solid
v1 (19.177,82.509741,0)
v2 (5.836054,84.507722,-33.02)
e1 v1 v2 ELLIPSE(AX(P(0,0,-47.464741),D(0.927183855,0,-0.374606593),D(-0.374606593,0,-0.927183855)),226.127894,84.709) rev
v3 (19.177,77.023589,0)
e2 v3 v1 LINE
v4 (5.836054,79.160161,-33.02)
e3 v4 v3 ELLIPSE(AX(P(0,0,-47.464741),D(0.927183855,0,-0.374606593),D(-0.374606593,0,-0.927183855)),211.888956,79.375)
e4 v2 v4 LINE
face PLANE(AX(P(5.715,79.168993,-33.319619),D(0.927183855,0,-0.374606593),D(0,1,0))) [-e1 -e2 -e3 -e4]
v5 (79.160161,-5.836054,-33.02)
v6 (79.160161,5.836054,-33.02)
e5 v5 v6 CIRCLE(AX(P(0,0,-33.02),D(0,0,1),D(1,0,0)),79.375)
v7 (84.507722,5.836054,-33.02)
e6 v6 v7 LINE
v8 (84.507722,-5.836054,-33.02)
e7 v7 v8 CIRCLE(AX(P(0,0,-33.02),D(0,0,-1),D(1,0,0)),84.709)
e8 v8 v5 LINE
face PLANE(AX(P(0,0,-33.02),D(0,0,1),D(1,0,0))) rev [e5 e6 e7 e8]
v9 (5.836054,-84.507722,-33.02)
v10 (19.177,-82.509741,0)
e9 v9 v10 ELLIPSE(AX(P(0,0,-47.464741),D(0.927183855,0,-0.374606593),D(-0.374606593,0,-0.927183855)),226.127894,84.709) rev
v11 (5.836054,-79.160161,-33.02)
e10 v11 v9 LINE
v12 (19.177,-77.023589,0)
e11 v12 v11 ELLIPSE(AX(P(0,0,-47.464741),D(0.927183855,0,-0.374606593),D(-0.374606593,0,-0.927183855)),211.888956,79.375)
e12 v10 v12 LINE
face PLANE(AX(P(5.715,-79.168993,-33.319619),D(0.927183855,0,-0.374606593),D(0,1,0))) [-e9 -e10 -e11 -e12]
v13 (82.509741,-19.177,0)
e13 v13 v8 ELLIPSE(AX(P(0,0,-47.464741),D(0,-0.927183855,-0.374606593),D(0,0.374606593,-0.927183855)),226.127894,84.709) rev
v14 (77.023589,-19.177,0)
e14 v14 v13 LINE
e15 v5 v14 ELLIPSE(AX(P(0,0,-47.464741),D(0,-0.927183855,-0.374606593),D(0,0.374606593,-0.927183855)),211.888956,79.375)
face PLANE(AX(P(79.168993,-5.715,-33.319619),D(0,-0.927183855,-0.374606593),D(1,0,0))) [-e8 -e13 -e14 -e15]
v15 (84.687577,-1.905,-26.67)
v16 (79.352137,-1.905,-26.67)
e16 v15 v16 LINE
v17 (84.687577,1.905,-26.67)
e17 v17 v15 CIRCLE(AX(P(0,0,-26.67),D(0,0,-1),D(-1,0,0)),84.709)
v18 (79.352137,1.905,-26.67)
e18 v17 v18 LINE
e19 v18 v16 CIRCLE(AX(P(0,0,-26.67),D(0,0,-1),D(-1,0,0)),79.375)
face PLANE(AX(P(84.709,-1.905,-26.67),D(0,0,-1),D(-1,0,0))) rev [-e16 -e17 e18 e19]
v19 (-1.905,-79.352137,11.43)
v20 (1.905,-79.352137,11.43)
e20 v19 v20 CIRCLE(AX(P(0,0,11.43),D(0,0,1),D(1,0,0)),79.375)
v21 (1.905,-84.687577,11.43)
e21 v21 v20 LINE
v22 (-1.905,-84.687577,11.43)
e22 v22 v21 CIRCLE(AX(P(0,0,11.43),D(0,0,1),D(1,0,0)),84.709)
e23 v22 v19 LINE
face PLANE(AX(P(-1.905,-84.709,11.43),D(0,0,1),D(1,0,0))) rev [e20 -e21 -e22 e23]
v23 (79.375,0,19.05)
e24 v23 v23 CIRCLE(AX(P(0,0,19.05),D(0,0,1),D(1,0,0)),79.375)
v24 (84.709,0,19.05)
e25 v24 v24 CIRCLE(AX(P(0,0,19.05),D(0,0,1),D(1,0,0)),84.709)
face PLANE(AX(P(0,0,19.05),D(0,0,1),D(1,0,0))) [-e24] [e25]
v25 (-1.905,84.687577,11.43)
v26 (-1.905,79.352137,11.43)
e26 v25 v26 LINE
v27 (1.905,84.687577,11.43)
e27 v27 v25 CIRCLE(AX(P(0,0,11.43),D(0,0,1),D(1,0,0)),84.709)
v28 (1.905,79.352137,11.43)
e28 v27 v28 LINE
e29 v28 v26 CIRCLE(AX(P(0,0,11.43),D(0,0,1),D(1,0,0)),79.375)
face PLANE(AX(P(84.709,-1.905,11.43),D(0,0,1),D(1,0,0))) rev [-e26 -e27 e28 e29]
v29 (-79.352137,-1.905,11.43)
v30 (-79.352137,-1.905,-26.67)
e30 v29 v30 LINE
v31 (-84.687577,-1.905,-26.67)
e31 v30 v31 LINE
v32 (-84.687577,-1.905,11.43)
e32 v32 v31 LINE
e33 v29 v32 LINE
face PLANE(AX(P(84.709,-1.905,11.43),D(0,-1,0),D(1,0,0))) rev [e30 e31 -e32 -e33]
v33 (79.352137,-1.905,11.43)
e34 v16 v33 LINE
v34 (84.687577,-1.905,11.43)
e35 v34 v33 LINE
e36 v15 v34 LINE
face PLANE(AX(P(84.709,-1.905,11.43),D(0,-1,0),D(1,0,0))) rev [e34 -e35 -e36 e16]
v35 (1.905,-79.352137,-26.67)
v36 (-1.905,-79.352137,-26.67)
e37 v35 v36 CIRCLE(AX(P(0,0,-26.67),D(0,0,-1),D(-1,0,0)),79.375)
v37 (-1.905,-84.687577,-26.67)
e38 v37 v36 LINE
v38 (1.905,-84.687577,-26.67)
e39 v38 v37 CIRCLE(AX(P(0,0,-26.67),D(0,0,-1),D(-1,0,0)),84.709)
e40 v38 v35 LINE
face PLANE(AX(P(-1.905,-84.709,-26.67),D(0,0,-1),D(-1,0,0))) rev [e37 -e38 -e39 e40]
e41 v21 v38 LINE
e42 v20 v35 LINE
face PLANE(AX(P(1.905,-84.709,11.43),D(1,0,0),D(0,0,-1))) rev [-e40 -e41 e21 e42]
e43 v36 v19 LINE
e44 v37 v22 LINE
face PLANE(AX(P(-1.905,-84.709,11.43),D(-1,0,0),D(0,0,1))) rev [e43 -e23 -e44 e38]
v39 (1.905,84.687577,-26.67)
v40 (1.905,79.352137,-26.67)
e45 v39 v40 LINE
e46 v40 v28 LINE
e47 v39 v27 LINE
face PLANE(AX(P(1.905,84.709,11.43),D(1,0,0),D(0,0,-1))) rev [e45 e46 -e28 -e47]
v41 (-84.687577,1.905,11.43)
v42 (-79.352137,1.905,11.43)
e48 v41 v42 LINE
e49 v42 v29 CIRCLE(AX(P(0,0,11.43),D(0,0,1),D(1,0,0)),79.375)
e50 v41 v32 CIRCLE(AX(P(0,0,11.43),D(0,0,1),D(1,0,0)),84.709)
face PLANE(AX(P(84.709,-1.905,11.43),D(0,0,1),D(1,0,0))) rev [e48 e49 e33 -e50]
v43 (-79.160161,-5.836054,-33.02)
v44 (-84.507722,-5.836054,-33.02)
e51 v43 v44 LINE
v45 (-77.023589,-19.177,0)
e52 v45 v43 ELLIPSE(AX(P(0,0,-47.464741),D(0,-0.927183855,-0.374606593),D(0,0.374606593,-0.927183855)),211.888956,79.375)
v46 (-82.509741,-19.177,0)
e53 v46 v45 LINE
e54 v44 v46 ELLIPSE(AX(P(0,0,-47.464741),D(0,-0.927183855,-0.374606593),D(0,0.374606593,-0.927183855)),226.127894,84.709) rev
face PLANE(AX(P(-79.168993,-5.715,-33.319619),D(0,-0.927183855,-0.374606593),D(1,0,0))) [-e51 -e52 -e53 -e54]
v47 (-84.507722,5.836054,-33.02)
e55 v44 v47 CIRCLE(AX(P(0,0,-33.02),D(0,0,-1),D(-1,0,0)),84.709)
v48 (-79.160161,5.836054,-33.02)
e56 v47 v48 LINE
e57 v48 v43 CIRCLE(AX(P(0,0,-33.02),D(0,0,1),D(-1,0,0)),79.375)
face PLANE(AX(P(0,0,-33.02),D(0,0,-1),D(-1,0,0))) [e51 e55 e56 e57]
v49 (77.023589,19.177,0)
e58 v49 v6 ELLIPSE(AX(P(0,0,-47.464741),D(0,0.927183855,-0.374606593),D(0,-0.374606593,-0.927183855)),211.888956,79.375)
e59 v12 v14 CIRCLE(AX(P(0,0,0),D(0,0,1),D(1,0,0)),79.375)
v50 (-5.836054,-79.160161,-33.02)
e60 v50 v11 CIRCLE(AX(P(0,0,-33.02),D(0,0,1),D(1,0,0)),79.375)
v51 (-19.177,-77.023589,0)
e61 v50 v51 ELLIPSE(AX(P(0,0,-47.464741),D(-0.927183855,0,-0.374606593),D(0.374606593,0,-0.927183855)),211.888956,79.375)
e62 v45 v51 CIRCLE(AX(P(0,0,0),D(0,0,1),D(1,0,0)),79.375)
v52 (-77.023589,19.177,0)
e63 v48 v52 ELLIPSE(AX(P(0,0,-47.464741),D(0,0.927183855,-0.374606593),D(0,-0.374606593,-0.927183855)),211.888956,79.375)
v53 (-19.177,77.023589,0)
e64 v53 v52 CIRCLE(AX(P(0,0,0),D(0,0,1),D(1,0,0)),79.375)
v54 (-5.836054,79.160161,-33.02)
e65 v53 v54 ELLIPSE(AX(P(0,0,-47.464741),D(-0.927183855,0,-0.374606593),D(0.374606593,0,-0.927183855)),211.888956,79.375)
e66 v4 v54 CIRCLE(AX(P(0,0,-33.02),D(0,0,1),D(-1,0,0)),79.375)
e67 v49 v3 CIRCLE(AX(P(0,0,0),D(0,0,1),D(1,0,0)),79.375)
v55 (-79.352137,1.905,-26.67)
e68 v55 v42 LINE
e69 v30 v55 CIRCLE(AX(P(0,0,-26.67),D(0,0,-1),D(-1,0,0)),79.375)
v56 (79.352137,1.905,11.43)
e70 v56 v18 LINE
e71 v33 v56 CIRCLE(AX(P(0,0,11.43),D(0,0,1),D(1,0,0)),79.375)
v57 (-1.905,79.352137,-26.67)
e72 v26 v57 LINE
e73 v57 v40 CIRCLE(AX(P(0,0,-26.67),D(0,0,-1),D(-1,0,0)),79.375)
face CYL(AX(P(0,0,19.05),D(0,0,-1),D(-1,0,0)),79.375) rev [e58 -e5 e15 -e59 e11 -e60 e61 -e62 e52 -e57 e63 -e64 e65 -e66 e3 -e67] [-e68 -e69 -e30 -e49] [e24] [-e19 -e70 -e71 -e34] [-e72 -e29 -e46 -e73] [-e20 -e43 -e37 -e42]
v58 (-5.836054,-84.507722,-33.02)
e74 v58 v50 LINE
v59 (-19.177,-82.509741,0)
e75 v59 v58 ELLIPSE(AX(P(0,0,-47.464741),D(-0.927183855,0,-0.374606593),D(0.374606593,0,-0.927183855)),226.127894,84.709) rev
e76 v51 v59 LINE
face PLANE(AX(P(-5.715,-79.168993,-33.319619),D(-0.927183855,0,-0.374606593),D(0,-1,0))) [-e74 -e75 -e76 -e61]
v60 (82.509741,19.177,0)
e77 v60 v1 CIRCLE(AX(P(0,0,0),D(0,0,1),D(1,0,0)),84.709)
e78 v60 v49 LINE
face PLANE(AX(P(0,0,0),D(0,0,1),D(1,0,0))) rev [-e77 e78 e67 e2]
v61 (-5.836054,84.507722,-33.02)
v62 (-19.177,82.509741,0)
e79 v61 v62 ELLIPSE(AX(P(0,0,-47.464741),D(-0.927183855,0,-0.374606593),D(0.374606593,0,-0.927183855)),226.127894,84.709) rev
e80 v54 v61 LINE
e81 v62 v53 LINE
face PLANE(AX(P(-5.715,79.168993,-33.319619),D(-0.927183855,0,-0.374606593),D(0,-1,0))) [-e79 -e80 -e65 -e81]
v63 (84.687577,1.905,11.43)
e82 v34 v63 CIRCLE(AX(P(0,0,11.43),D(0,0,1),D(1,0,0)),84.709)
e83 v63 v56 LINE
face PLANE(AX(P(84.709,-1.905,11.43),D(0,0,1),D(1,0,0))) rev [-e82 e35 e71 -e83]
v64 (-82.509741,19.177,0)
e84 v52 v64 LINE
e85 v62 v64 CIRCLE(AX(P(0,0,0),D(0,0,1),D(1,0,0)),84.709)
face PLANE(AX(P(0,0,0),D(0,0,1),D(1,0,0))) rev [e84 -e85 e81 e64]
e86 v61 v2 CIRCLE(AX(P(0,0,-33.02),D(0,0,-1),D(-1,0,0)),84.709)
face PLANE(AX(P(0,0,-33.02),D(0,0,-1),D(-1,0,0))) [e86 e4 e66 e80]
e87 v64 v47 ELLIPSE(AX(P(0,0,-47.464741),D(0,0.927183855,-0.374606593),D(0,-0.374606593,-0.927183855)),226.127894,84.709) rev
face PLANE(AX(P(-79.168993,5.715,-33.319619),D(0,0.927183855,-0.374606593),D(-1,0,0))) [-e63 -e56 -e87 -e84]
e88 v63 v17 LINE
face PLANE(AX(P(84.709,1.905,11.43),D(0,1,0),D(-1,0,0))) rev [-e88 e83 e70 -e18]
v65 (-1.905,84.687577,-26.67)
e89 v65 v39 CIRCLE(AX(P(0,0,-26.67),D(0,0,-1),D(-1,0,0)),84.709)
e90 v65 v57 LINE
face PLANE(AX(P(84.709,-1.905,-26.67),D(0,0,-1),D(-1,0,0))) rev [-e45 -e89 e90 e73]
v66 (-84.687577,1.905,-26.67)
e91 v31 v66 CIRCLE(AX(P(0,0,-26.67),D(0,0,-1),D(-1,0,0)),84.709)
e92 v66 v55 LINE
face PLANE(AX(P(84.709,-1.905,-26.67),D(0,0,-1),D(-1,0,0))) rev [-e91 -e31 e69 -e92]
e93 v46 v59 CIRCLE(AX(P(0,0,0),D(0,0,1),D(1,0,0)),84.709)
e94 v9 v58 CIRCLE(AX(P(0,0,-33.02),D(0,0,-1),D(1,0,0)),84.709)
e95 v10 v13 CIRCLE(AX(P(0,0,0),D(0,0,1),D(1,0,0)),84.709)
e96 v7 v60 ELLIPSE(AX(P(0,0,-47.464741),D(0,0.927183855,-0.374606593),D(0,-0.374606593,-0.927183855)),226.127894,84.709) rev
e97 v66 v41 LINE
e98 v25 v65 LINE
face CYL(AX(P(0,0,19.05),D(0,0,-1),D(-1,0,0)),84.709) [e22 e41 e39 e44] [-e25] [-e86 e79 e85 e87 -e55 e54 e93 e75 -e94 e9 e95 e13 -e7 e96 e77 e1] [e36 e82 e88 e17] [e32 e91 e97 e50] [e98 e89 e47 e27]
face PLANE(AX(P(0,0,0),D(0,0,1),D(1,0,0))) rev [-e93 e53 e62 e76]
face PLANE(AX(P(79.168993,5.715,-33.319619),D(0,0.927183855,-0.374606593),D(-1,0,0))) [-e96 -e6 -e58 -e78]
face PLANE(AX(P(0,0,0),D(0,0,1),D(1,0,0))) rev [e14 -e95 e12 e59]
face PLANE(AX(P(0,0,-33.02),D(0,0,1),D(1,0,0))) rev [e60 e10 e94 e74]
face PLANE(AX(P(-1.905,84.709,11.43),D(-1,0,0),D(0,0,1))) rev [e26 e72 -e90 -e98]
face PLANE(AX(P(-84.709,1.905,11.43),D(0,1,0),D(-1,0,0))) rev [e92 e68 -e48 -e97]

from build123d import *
from build123d.topology import SkipClean

# Parameters (mm, degrees)
SKETCH1_R           = 84.709
SKETCH1_R_2         = 79.375
BOSS_EXTRUDE1_DEPTH = 19.05
BOSS_EXTRUDE2_START = 33.02
BOSS_EXTRUDE2_DEPTH = 33.02
SKETCH2_W           = 3.81
SKETCH2_H           = 38.1
CUT_EXTRUDE1_DEPTH  = 125.264032455
CIRPATTERN1_COUNT   = 4
CHAMFER1_SIZE       = 13.462
CHAMFER1_SIZE_2     = 33.319619221


with BuildPart() as part:
    # Sketch1 → Boss-Extrude1 (new body)
    with BuildSketch(Plane.XY):
        with Locations(Location((0, 0, 0), (0, 0, 180))):
            Circle(SKETCH1_R)
        with Locations(Location((0, 0, 0), (0, 0, 180))):
            Circle(SKETCH1_R_2, mode=Mode.SUBTRACT)
    extrude(amount=BOSS_EXTRUDE1_DEPTH)

    # Sketch3 → Boss-Extrude2 (add)
    with SkipClean():  # the faces are left unmerged after this step: merging them gives an invalid solid
        with BuildSketch(Plane(origin=(0, 0, 0), x_dir=(-1, 0, 0), z_dir=(0, 0, -1)).offset(BOSS_EXTRUDE2_START)):
            with BuildLine():
                Line((-5.715, 79.168992668), (-5.715, 84.515995267))
                ThreePointArc((-5.715, 84.515995267), (0, 84.709), (5.715, 84.515995267))
                Line((5.715, 84.515995267), (5.715, 79.168992668))
                ThreePointArc((5.715, 79.168992668), (0, 79.375), (-5.715, 79.168992668))
            make_face()
            with BuildLine():
                Line((-5.715, -79.168992668), (-5.715, -84.515995267))
                ThreePointArc((-5.715, -84.515995267), (0, -84.709), (5.715, -84.515995267))
                Line((5.715, -84.515995267), (5.715, -79.168992668))
                ThreePointArc((5.715, -79.168992668), (0, -79.375), (-5.715, -79.168992668))
            make_face()
            with BuildLine():
                Line((79.168992668, -5.715), (84.515995267, -5.715))
                ThreePointArc((84.515995267, -5.715), (84.709, 0), (84.515995267, 5.715))
                Line((84.515995267, 5.715), (79.168992668, 5.715))
                ThreePointArc((79.168992668, 5.715), (79.375, 0), (79.168992668, -5.715))
            make_face()
            with BuildLine():
                Line((-79.168992668, 5.715), (-84.515995267, 5.715))
                ThreePointArc((-84.515995267, 5.715), (-84.709, 0), (-84.515995267, -5.715))
                Line((-84.515995267, -5.715), (-79.168992668, -5.715))
                ThreePointArc((-79.168992668, -5.715), (-79.375, 0), (-79.168992668, 5.715))
            make_face()
        extrude(amount=-BOSS_EXTRUDE2_DEPTH)

    # Sketch2 → Cut-Extrude1 (cut, through all)
    with SkipClean():  # the faces are left unmerged after this step: merging them gives an invalid solid
        with BuildSketch(Plane(origin=(0, 0, 0), x_dir=(1, 0, 0), z_dir=(0, 1, 0))):
            with Locations((0, 7.62)):
                Rectangle(SKETCH2_W, SKETCH2_H)
        cut_extrude1 = extrude(amount=-CUT_EXTRUDE1_DEPTH, mode=Mode.SUBTRACT)

    # CirPattern1: Cut-Extrude1 ×4 about axis
    with SkipClean():  # the faces are left unmerged after this step: merging them gives an invalid solid
        cirpattern1_axis = Axis((0, 0, 0), (0, 0, 1))
        for i in range(1, CIRPATTERN1_COUNT):
            add(cut_extrude1.rotate(cirpattern1_axis, i * 360 / CIRPATTERN1_COUNT), mode=Mode.SUBTRACT)

    # Chamfer1
    # the kernel refuses this chamfer: 33.319619221, 13.462 mm, written as the material it adds along each edge
    with BuildSketch(Plane(origin=(-5.715, 170.913401218, 0), x_dir=(-0.9961057015681392, 0, 0.08816706473193561), z_dir=(0, -1, 0))) as chamfer1_piece_1_section:
        Polygon((CHAMFER1_SIZE * 0.996105701568, CHAMFER1_SIZE * 0.0881670647319), (-CHAMFER1_SIZE_2 * 0.0881670647311, CHAMFER1_SIZE_2 * 0.996105701559), (0, 0), align=None)
    chamfer1_piece_1 = extrude(amount=178.141814502, mode=Mode.PRIVATE)
    chamfer1_piece_1 = chamfer1_piece_1 & Plane(origin=(0, 0, -11.191625659), x_dir=(-1, 0, 0), z_dir=(0, 0, -1)) * Cylinder(84.709, 490, mode=Mode.PRIVATE)
    chamfer1_piece_1 = chamfer1_piece_1 - Plane(origin=(0, 0, -11.191625659), x_dir=(-1, 0, 0), z_dir=(0, 0, -1)) * Cylinder(79.375, 490, mode=Mode.PRIVATE)
    chamfer1_piece_1 = split(chamfer1_piece_1, bisect_by=Plane(origin=(-9.949714127, 81.358468366, -33.02), z_dir=(0, 0, 1)), keep=Keep.TOP, mode=Mode.PRIVATE)
    add(chamfer1_piece_1)
    with BuildSketch(Plane(origin=(-170.913401218, 5.715, 0), x_dir=(1.3071407043529467e-14, 0.9961057015681392, 0.08816706473193561), z_dir=(1, 0, 0))) as chamfer1_piece_2_section:
        Polygon((CHAMFER1_SIZE * 0.996105701568, -CHAMFER1_SIZE * 0.0881670647319), (-CHAMFER1_SIZE_2 * 0.0881670647311, -CHAMFER1_SIZE_2 * 0.996105701559), (0, 0), align=None)
    chamfer1_piece_2 = extrude(amount=178.141814502, mode=Mode.PRIVATE)
    chamfer1_piece_2 = chamfer1_piece_2 & Plane(origin=(0, 0, -11.191625637), x_dir=(-1, 0, 0), z_dir=(0, 0, -1)) * Cylinder(84.709, 490, mode=Mode.PRIVATE)
    chamfer1_piece_2 = chamfer1_piece_2 - Plane(origin=(0, 0, -11.191625637), x_dir=(-1, 0, 0), z_dir=(0, 0, -1)) * Cylinder(79.375, 490, mode=Mode.PRIVATE)
    chamfer1_piece_2 = split(chamfer1_piece_2, bisect_by=Plane(origin=(-81.358468349, 9.949714129, -33.02), z_dir=(0, 0, 1)), keep=Keep.TOP, mode=Mode.PRIVATE)
    add(chamfer1_piece_2)
    with BuildSketch(Plane(origin=(5.715, -7.228413283, 0), x_dir=(0.9961057015681392, 0, 0.08816706473193561), z_dir=(0, 1, 0))) as chamfer1_piece_3_section:
        Polygon((CHAMFER1_SIZE * 0.996105701568, CHAMFER1_SIZE * 0.0881670647319), (-CHAMFER1_SIZE_2 * 0.0881670647311, CHAMFER1_SIZE_2 * 0.996105701559), (0, 0), align=None)
    chamfer1_piece_3 = extrude(amount=178.141814502, mode=Mode.PRIVATE)
    chamfer1_piece_3 = chamfer1_piece_3 & Plane(origin=(0, 0, -11.191625637), x_dir=(-1, 0, 0), z_dir=(0, 0, -1)) * Cylinder(84.709, 490, mode=Mode.PRIVATE)
    chamfer1_piece_3 = chamfer1_piece_3 - Plane(origin=(0, 0, -11.191625637), x_dir=(-1, 0, 0), z_dir=(0, 0, -1)) * Cylinder(79.375, 490, mode=Mode.PRIVATE)
    chamfer1_piece_3 = split(chamfer1_piece_3, bisect_by=Plane(origin=(9.949714129, 81.358468349, -33.02), z_dir=(0, 0, 1)), keep=Keep.TOP, mode=Mode.PRIVATE)
    add(chamfer1_piece_3)
    with BuildSketch(Plane(origin=(-7.228413283, 5.715, 0), x_dir=(-1.3071407043529467e-14, 0.9961057015681392, 0.08816706473193563), z_dir=(1, 0, 0))) as chamfer1_piece_4_section:
        Polygon((CHAMFER1_SIZE * 0.996105701568, -CHAMFER1_SIZE * 0.0881670647319), (-CHAMFER1_SIZE_2 * 0.0881670647311, -CHAMFER1_SIZE_2 * 0.996105701559), (0, 0), align=None)
    chamfer1_piece_4 = extrude(amount=178.141814502, mode=Mode.PRIVATE)
    chamfer1_piece_4 = chamfer1_piece_4 & Plane(origin=(0, 0, -11.191625658), x_dir=(-1, 0, 0), z_dir=(0, 0, -1)) * Cylinder(84.709, 490, mode=Mode.PRIVATE)
    chamfer1_piece_4 = chamfer1_piece_4 - Plane(origin=(0, 0, -11.191625658), x_dir=(-1, 0, 0), z_dir=(0, 0, -1)) * Cylinder(79.375, 490, mode=Mode.PRIVATE)
    chamfer1_piece_4 = split(chamfer1_piece_4, bisect_by=Plane(origin=(81.358468366, 9.949714127, -33.02), z_dir=(0, 0, 1)), keep=Keep.TOP, mode=Mode.PRIVATE)
    add(chamfer1_piece_4)
    with BuildSketch(Plane(origin=(-5.715, -170.913401218, 0), x_dir=(-0.9961057015681392, 0, 0.08816706473193561), z_dir=(0, 1, 0))) as chamfer1_piece_5_section:
        Polygon((CHAMFER1_SIZE * 0.996105701568, -CHAMFER1_SIZE * 0.0881670647319), (-CHAMFER1_SIZE_2 * 0.0881670647311, -CHAMFER1_SIZE_2 * 0.996105701559), (0, 0), align=None)
    chamfer1_piece_5 = extrude(amount=178.141814502, mode=Mode.PRIVATE)
    chamfer1_piece_5 = chamfer1_piece_5 & Plane(origin=(0, 0, -11.191625637), x_dir=(-1, 0, 0), z_dir=(0, 0, -1)) * Cylinder(84.709, 490, mode=Mode.PRIVATE)
    chamfer1_piece_5 = chamfer1_piece_5 - Plane(origin=(0, 0, -11.191625637), x_dir=(-1, 0, 0), z_dir=(0, 0, -1)) * Cylinder(79.375, 490, mode=Mode.PRIVATE)
    chamfer1_piece_5 = split(chamfer1_piece_5, bisect_by=Plane(origin=(-9.949714129, -81.358468349, -33.02), z_dir=(0, 0, 1)), keep=Keep.TOP, mode=Mode.PRIVATE)
    add(chamfer1_piece_5)
    with BuildSketch(Plane(origin=(7.228413283, -5.715, 0), x_dir=(-1.5553319773313542e-14, -0.9961057015681392, 0.08816706473193561), z_dir=(-1, 0, 0))) as chamfer1_piece_6_section:
        Polygon((CHAMFER1_SIZE * 0.996105701568, -CHAMFER1_SIZE * 0.0881670647319), (-CHAMFER1_SIZE_2 * 0.0881670647311, -CHAMFER1_SIZE_2 * 0.996105701559), (0, 0), align=None)
    chamfer1_piece_6 = extrude(amount=178.141814502, mode=Mode.PRIVATE)
    chamfer1_piece_6 = chamfer1_piece_6 & Plane(origin=(0, 0, -11.191625659), x_dir=(-1, 0, 0), z_dir=(0, 0, -1)) * Cylinder(84.709, 490, mode=Mode.PRIVATE)
    chamfer1_piece_6 = chamfer1_piece_6 - Plane(origin=(0, 0, -11.191625659), x_dir=(-1, 0, 0), z_dir=(0, 0, -1)) * Cylinder(79.375, 490, mode=Mode.PRIVATE)
    chamfer1_piece_6 = split(chamfer1_piece_6, bisect_by=Plane(origin=(-81.358468366, -9.949714127, -33.02), z_dir=(0, 0, 1)), keep=Keep.TOP, mode=Mode.PRIVATE)
    add(chamfer1_piece_6)
    with BuildSketch(Plane(origin=(5.715, 7.228413283, 0), x_dir=(0.9961057015681392, 0, 0.08816706473193563), z_dir=(0, -1, 0))) as chamfer1_piece_7_section:
        Polygon((CHAMFER1_SIZE * 0.996105701568, -CHAMFER1_SIZE * 0.0881670647319), (-CHAMFER1_SIZE_2 * 0.0881670647311, -CHAMFER1_SIZE_2 * 0.996105701559), (0, 0), align=None)
    chamfer1_piece_7 = extrude(amount=178.141814502, mode=Mode.PRIVATE)
    chamfer1_piece_7 = chamfer1_piece_7 & Plane(origin=(0, 0, -11.191625659), x_dir=(-1, 0, 0), z_dir=(0, 0, -1)) * Cylinder(84.709, 490, mode=Mode.PRIVATE)
    chamfer1_piece_7 = chamfer1_piece_7 - Plane(origin=(0, 0, -11.191625659), x_dir=(-1, 0, 0), z_dir=(0, 0, -1)) * Cylinder(79.375, 490, mode=Mode.PRIVATE)
    chamfer1_piece_7 = split(chamfer1_piece_7, bisect_by=Plane(origin=(9.949714127, -81.358468366, -33.02), z_dir=(0, 0, 1)), keep=Keep.TOP, mode=Mode.PRIVATE)
    add(chamfer1_piece_7)
    with BuildSketch(Plane(origin=(170.913401218, -5.715, 0), x_dir=(1.555331977331354e-14, -0.9961057015681392, 0.08816706473193561), z_dir=(-1, 0, 0))) as chamfer1_piece_8_section:
        Polygon((CHAMFER1_SIZE * 0.996105701568, -CHAMFER1_SIZE * 0.0881670647319), (-CHAMFER1_SIZE_2 * 0.0881670647311, -CHAMFER1_SIZE_2 * 0.996105701559), (0, 0), align=None)
    chamfer1_piece_8 = extrude(amount=178.141814502, mode=Mode.PRIVATE)
    chamfer1_piece_8 = chamfer1_piece_8 & Plane(origin=(0, 0, -11.191625637), x_dir=(-1, 0, 0), z_dir=(0, 0, -1)) * Cylinder(84.709, 490, mode=Mode.PRIVATE)
    chamfer1_piece_8 = chamfer1_piece_8 - Plane(origin=(0, 0, -11.191625637), x_dir=(-1, 0, 0), z_dir=(0, 0, -1)) * Cylinder(79.375, 490, mode=Mode.PRIVATE)
    chamfer1_piece_8 = split(chamfer1_piece_8, bisect_by=Plane(origin=(81.358468349, -9.949714129, -33.02), z_dir=(0, 0, 1)), keep=Keep.TOP, mode=Mode.PRIVATE)
    add(chamfer1_piece_8)


solid = part.part
